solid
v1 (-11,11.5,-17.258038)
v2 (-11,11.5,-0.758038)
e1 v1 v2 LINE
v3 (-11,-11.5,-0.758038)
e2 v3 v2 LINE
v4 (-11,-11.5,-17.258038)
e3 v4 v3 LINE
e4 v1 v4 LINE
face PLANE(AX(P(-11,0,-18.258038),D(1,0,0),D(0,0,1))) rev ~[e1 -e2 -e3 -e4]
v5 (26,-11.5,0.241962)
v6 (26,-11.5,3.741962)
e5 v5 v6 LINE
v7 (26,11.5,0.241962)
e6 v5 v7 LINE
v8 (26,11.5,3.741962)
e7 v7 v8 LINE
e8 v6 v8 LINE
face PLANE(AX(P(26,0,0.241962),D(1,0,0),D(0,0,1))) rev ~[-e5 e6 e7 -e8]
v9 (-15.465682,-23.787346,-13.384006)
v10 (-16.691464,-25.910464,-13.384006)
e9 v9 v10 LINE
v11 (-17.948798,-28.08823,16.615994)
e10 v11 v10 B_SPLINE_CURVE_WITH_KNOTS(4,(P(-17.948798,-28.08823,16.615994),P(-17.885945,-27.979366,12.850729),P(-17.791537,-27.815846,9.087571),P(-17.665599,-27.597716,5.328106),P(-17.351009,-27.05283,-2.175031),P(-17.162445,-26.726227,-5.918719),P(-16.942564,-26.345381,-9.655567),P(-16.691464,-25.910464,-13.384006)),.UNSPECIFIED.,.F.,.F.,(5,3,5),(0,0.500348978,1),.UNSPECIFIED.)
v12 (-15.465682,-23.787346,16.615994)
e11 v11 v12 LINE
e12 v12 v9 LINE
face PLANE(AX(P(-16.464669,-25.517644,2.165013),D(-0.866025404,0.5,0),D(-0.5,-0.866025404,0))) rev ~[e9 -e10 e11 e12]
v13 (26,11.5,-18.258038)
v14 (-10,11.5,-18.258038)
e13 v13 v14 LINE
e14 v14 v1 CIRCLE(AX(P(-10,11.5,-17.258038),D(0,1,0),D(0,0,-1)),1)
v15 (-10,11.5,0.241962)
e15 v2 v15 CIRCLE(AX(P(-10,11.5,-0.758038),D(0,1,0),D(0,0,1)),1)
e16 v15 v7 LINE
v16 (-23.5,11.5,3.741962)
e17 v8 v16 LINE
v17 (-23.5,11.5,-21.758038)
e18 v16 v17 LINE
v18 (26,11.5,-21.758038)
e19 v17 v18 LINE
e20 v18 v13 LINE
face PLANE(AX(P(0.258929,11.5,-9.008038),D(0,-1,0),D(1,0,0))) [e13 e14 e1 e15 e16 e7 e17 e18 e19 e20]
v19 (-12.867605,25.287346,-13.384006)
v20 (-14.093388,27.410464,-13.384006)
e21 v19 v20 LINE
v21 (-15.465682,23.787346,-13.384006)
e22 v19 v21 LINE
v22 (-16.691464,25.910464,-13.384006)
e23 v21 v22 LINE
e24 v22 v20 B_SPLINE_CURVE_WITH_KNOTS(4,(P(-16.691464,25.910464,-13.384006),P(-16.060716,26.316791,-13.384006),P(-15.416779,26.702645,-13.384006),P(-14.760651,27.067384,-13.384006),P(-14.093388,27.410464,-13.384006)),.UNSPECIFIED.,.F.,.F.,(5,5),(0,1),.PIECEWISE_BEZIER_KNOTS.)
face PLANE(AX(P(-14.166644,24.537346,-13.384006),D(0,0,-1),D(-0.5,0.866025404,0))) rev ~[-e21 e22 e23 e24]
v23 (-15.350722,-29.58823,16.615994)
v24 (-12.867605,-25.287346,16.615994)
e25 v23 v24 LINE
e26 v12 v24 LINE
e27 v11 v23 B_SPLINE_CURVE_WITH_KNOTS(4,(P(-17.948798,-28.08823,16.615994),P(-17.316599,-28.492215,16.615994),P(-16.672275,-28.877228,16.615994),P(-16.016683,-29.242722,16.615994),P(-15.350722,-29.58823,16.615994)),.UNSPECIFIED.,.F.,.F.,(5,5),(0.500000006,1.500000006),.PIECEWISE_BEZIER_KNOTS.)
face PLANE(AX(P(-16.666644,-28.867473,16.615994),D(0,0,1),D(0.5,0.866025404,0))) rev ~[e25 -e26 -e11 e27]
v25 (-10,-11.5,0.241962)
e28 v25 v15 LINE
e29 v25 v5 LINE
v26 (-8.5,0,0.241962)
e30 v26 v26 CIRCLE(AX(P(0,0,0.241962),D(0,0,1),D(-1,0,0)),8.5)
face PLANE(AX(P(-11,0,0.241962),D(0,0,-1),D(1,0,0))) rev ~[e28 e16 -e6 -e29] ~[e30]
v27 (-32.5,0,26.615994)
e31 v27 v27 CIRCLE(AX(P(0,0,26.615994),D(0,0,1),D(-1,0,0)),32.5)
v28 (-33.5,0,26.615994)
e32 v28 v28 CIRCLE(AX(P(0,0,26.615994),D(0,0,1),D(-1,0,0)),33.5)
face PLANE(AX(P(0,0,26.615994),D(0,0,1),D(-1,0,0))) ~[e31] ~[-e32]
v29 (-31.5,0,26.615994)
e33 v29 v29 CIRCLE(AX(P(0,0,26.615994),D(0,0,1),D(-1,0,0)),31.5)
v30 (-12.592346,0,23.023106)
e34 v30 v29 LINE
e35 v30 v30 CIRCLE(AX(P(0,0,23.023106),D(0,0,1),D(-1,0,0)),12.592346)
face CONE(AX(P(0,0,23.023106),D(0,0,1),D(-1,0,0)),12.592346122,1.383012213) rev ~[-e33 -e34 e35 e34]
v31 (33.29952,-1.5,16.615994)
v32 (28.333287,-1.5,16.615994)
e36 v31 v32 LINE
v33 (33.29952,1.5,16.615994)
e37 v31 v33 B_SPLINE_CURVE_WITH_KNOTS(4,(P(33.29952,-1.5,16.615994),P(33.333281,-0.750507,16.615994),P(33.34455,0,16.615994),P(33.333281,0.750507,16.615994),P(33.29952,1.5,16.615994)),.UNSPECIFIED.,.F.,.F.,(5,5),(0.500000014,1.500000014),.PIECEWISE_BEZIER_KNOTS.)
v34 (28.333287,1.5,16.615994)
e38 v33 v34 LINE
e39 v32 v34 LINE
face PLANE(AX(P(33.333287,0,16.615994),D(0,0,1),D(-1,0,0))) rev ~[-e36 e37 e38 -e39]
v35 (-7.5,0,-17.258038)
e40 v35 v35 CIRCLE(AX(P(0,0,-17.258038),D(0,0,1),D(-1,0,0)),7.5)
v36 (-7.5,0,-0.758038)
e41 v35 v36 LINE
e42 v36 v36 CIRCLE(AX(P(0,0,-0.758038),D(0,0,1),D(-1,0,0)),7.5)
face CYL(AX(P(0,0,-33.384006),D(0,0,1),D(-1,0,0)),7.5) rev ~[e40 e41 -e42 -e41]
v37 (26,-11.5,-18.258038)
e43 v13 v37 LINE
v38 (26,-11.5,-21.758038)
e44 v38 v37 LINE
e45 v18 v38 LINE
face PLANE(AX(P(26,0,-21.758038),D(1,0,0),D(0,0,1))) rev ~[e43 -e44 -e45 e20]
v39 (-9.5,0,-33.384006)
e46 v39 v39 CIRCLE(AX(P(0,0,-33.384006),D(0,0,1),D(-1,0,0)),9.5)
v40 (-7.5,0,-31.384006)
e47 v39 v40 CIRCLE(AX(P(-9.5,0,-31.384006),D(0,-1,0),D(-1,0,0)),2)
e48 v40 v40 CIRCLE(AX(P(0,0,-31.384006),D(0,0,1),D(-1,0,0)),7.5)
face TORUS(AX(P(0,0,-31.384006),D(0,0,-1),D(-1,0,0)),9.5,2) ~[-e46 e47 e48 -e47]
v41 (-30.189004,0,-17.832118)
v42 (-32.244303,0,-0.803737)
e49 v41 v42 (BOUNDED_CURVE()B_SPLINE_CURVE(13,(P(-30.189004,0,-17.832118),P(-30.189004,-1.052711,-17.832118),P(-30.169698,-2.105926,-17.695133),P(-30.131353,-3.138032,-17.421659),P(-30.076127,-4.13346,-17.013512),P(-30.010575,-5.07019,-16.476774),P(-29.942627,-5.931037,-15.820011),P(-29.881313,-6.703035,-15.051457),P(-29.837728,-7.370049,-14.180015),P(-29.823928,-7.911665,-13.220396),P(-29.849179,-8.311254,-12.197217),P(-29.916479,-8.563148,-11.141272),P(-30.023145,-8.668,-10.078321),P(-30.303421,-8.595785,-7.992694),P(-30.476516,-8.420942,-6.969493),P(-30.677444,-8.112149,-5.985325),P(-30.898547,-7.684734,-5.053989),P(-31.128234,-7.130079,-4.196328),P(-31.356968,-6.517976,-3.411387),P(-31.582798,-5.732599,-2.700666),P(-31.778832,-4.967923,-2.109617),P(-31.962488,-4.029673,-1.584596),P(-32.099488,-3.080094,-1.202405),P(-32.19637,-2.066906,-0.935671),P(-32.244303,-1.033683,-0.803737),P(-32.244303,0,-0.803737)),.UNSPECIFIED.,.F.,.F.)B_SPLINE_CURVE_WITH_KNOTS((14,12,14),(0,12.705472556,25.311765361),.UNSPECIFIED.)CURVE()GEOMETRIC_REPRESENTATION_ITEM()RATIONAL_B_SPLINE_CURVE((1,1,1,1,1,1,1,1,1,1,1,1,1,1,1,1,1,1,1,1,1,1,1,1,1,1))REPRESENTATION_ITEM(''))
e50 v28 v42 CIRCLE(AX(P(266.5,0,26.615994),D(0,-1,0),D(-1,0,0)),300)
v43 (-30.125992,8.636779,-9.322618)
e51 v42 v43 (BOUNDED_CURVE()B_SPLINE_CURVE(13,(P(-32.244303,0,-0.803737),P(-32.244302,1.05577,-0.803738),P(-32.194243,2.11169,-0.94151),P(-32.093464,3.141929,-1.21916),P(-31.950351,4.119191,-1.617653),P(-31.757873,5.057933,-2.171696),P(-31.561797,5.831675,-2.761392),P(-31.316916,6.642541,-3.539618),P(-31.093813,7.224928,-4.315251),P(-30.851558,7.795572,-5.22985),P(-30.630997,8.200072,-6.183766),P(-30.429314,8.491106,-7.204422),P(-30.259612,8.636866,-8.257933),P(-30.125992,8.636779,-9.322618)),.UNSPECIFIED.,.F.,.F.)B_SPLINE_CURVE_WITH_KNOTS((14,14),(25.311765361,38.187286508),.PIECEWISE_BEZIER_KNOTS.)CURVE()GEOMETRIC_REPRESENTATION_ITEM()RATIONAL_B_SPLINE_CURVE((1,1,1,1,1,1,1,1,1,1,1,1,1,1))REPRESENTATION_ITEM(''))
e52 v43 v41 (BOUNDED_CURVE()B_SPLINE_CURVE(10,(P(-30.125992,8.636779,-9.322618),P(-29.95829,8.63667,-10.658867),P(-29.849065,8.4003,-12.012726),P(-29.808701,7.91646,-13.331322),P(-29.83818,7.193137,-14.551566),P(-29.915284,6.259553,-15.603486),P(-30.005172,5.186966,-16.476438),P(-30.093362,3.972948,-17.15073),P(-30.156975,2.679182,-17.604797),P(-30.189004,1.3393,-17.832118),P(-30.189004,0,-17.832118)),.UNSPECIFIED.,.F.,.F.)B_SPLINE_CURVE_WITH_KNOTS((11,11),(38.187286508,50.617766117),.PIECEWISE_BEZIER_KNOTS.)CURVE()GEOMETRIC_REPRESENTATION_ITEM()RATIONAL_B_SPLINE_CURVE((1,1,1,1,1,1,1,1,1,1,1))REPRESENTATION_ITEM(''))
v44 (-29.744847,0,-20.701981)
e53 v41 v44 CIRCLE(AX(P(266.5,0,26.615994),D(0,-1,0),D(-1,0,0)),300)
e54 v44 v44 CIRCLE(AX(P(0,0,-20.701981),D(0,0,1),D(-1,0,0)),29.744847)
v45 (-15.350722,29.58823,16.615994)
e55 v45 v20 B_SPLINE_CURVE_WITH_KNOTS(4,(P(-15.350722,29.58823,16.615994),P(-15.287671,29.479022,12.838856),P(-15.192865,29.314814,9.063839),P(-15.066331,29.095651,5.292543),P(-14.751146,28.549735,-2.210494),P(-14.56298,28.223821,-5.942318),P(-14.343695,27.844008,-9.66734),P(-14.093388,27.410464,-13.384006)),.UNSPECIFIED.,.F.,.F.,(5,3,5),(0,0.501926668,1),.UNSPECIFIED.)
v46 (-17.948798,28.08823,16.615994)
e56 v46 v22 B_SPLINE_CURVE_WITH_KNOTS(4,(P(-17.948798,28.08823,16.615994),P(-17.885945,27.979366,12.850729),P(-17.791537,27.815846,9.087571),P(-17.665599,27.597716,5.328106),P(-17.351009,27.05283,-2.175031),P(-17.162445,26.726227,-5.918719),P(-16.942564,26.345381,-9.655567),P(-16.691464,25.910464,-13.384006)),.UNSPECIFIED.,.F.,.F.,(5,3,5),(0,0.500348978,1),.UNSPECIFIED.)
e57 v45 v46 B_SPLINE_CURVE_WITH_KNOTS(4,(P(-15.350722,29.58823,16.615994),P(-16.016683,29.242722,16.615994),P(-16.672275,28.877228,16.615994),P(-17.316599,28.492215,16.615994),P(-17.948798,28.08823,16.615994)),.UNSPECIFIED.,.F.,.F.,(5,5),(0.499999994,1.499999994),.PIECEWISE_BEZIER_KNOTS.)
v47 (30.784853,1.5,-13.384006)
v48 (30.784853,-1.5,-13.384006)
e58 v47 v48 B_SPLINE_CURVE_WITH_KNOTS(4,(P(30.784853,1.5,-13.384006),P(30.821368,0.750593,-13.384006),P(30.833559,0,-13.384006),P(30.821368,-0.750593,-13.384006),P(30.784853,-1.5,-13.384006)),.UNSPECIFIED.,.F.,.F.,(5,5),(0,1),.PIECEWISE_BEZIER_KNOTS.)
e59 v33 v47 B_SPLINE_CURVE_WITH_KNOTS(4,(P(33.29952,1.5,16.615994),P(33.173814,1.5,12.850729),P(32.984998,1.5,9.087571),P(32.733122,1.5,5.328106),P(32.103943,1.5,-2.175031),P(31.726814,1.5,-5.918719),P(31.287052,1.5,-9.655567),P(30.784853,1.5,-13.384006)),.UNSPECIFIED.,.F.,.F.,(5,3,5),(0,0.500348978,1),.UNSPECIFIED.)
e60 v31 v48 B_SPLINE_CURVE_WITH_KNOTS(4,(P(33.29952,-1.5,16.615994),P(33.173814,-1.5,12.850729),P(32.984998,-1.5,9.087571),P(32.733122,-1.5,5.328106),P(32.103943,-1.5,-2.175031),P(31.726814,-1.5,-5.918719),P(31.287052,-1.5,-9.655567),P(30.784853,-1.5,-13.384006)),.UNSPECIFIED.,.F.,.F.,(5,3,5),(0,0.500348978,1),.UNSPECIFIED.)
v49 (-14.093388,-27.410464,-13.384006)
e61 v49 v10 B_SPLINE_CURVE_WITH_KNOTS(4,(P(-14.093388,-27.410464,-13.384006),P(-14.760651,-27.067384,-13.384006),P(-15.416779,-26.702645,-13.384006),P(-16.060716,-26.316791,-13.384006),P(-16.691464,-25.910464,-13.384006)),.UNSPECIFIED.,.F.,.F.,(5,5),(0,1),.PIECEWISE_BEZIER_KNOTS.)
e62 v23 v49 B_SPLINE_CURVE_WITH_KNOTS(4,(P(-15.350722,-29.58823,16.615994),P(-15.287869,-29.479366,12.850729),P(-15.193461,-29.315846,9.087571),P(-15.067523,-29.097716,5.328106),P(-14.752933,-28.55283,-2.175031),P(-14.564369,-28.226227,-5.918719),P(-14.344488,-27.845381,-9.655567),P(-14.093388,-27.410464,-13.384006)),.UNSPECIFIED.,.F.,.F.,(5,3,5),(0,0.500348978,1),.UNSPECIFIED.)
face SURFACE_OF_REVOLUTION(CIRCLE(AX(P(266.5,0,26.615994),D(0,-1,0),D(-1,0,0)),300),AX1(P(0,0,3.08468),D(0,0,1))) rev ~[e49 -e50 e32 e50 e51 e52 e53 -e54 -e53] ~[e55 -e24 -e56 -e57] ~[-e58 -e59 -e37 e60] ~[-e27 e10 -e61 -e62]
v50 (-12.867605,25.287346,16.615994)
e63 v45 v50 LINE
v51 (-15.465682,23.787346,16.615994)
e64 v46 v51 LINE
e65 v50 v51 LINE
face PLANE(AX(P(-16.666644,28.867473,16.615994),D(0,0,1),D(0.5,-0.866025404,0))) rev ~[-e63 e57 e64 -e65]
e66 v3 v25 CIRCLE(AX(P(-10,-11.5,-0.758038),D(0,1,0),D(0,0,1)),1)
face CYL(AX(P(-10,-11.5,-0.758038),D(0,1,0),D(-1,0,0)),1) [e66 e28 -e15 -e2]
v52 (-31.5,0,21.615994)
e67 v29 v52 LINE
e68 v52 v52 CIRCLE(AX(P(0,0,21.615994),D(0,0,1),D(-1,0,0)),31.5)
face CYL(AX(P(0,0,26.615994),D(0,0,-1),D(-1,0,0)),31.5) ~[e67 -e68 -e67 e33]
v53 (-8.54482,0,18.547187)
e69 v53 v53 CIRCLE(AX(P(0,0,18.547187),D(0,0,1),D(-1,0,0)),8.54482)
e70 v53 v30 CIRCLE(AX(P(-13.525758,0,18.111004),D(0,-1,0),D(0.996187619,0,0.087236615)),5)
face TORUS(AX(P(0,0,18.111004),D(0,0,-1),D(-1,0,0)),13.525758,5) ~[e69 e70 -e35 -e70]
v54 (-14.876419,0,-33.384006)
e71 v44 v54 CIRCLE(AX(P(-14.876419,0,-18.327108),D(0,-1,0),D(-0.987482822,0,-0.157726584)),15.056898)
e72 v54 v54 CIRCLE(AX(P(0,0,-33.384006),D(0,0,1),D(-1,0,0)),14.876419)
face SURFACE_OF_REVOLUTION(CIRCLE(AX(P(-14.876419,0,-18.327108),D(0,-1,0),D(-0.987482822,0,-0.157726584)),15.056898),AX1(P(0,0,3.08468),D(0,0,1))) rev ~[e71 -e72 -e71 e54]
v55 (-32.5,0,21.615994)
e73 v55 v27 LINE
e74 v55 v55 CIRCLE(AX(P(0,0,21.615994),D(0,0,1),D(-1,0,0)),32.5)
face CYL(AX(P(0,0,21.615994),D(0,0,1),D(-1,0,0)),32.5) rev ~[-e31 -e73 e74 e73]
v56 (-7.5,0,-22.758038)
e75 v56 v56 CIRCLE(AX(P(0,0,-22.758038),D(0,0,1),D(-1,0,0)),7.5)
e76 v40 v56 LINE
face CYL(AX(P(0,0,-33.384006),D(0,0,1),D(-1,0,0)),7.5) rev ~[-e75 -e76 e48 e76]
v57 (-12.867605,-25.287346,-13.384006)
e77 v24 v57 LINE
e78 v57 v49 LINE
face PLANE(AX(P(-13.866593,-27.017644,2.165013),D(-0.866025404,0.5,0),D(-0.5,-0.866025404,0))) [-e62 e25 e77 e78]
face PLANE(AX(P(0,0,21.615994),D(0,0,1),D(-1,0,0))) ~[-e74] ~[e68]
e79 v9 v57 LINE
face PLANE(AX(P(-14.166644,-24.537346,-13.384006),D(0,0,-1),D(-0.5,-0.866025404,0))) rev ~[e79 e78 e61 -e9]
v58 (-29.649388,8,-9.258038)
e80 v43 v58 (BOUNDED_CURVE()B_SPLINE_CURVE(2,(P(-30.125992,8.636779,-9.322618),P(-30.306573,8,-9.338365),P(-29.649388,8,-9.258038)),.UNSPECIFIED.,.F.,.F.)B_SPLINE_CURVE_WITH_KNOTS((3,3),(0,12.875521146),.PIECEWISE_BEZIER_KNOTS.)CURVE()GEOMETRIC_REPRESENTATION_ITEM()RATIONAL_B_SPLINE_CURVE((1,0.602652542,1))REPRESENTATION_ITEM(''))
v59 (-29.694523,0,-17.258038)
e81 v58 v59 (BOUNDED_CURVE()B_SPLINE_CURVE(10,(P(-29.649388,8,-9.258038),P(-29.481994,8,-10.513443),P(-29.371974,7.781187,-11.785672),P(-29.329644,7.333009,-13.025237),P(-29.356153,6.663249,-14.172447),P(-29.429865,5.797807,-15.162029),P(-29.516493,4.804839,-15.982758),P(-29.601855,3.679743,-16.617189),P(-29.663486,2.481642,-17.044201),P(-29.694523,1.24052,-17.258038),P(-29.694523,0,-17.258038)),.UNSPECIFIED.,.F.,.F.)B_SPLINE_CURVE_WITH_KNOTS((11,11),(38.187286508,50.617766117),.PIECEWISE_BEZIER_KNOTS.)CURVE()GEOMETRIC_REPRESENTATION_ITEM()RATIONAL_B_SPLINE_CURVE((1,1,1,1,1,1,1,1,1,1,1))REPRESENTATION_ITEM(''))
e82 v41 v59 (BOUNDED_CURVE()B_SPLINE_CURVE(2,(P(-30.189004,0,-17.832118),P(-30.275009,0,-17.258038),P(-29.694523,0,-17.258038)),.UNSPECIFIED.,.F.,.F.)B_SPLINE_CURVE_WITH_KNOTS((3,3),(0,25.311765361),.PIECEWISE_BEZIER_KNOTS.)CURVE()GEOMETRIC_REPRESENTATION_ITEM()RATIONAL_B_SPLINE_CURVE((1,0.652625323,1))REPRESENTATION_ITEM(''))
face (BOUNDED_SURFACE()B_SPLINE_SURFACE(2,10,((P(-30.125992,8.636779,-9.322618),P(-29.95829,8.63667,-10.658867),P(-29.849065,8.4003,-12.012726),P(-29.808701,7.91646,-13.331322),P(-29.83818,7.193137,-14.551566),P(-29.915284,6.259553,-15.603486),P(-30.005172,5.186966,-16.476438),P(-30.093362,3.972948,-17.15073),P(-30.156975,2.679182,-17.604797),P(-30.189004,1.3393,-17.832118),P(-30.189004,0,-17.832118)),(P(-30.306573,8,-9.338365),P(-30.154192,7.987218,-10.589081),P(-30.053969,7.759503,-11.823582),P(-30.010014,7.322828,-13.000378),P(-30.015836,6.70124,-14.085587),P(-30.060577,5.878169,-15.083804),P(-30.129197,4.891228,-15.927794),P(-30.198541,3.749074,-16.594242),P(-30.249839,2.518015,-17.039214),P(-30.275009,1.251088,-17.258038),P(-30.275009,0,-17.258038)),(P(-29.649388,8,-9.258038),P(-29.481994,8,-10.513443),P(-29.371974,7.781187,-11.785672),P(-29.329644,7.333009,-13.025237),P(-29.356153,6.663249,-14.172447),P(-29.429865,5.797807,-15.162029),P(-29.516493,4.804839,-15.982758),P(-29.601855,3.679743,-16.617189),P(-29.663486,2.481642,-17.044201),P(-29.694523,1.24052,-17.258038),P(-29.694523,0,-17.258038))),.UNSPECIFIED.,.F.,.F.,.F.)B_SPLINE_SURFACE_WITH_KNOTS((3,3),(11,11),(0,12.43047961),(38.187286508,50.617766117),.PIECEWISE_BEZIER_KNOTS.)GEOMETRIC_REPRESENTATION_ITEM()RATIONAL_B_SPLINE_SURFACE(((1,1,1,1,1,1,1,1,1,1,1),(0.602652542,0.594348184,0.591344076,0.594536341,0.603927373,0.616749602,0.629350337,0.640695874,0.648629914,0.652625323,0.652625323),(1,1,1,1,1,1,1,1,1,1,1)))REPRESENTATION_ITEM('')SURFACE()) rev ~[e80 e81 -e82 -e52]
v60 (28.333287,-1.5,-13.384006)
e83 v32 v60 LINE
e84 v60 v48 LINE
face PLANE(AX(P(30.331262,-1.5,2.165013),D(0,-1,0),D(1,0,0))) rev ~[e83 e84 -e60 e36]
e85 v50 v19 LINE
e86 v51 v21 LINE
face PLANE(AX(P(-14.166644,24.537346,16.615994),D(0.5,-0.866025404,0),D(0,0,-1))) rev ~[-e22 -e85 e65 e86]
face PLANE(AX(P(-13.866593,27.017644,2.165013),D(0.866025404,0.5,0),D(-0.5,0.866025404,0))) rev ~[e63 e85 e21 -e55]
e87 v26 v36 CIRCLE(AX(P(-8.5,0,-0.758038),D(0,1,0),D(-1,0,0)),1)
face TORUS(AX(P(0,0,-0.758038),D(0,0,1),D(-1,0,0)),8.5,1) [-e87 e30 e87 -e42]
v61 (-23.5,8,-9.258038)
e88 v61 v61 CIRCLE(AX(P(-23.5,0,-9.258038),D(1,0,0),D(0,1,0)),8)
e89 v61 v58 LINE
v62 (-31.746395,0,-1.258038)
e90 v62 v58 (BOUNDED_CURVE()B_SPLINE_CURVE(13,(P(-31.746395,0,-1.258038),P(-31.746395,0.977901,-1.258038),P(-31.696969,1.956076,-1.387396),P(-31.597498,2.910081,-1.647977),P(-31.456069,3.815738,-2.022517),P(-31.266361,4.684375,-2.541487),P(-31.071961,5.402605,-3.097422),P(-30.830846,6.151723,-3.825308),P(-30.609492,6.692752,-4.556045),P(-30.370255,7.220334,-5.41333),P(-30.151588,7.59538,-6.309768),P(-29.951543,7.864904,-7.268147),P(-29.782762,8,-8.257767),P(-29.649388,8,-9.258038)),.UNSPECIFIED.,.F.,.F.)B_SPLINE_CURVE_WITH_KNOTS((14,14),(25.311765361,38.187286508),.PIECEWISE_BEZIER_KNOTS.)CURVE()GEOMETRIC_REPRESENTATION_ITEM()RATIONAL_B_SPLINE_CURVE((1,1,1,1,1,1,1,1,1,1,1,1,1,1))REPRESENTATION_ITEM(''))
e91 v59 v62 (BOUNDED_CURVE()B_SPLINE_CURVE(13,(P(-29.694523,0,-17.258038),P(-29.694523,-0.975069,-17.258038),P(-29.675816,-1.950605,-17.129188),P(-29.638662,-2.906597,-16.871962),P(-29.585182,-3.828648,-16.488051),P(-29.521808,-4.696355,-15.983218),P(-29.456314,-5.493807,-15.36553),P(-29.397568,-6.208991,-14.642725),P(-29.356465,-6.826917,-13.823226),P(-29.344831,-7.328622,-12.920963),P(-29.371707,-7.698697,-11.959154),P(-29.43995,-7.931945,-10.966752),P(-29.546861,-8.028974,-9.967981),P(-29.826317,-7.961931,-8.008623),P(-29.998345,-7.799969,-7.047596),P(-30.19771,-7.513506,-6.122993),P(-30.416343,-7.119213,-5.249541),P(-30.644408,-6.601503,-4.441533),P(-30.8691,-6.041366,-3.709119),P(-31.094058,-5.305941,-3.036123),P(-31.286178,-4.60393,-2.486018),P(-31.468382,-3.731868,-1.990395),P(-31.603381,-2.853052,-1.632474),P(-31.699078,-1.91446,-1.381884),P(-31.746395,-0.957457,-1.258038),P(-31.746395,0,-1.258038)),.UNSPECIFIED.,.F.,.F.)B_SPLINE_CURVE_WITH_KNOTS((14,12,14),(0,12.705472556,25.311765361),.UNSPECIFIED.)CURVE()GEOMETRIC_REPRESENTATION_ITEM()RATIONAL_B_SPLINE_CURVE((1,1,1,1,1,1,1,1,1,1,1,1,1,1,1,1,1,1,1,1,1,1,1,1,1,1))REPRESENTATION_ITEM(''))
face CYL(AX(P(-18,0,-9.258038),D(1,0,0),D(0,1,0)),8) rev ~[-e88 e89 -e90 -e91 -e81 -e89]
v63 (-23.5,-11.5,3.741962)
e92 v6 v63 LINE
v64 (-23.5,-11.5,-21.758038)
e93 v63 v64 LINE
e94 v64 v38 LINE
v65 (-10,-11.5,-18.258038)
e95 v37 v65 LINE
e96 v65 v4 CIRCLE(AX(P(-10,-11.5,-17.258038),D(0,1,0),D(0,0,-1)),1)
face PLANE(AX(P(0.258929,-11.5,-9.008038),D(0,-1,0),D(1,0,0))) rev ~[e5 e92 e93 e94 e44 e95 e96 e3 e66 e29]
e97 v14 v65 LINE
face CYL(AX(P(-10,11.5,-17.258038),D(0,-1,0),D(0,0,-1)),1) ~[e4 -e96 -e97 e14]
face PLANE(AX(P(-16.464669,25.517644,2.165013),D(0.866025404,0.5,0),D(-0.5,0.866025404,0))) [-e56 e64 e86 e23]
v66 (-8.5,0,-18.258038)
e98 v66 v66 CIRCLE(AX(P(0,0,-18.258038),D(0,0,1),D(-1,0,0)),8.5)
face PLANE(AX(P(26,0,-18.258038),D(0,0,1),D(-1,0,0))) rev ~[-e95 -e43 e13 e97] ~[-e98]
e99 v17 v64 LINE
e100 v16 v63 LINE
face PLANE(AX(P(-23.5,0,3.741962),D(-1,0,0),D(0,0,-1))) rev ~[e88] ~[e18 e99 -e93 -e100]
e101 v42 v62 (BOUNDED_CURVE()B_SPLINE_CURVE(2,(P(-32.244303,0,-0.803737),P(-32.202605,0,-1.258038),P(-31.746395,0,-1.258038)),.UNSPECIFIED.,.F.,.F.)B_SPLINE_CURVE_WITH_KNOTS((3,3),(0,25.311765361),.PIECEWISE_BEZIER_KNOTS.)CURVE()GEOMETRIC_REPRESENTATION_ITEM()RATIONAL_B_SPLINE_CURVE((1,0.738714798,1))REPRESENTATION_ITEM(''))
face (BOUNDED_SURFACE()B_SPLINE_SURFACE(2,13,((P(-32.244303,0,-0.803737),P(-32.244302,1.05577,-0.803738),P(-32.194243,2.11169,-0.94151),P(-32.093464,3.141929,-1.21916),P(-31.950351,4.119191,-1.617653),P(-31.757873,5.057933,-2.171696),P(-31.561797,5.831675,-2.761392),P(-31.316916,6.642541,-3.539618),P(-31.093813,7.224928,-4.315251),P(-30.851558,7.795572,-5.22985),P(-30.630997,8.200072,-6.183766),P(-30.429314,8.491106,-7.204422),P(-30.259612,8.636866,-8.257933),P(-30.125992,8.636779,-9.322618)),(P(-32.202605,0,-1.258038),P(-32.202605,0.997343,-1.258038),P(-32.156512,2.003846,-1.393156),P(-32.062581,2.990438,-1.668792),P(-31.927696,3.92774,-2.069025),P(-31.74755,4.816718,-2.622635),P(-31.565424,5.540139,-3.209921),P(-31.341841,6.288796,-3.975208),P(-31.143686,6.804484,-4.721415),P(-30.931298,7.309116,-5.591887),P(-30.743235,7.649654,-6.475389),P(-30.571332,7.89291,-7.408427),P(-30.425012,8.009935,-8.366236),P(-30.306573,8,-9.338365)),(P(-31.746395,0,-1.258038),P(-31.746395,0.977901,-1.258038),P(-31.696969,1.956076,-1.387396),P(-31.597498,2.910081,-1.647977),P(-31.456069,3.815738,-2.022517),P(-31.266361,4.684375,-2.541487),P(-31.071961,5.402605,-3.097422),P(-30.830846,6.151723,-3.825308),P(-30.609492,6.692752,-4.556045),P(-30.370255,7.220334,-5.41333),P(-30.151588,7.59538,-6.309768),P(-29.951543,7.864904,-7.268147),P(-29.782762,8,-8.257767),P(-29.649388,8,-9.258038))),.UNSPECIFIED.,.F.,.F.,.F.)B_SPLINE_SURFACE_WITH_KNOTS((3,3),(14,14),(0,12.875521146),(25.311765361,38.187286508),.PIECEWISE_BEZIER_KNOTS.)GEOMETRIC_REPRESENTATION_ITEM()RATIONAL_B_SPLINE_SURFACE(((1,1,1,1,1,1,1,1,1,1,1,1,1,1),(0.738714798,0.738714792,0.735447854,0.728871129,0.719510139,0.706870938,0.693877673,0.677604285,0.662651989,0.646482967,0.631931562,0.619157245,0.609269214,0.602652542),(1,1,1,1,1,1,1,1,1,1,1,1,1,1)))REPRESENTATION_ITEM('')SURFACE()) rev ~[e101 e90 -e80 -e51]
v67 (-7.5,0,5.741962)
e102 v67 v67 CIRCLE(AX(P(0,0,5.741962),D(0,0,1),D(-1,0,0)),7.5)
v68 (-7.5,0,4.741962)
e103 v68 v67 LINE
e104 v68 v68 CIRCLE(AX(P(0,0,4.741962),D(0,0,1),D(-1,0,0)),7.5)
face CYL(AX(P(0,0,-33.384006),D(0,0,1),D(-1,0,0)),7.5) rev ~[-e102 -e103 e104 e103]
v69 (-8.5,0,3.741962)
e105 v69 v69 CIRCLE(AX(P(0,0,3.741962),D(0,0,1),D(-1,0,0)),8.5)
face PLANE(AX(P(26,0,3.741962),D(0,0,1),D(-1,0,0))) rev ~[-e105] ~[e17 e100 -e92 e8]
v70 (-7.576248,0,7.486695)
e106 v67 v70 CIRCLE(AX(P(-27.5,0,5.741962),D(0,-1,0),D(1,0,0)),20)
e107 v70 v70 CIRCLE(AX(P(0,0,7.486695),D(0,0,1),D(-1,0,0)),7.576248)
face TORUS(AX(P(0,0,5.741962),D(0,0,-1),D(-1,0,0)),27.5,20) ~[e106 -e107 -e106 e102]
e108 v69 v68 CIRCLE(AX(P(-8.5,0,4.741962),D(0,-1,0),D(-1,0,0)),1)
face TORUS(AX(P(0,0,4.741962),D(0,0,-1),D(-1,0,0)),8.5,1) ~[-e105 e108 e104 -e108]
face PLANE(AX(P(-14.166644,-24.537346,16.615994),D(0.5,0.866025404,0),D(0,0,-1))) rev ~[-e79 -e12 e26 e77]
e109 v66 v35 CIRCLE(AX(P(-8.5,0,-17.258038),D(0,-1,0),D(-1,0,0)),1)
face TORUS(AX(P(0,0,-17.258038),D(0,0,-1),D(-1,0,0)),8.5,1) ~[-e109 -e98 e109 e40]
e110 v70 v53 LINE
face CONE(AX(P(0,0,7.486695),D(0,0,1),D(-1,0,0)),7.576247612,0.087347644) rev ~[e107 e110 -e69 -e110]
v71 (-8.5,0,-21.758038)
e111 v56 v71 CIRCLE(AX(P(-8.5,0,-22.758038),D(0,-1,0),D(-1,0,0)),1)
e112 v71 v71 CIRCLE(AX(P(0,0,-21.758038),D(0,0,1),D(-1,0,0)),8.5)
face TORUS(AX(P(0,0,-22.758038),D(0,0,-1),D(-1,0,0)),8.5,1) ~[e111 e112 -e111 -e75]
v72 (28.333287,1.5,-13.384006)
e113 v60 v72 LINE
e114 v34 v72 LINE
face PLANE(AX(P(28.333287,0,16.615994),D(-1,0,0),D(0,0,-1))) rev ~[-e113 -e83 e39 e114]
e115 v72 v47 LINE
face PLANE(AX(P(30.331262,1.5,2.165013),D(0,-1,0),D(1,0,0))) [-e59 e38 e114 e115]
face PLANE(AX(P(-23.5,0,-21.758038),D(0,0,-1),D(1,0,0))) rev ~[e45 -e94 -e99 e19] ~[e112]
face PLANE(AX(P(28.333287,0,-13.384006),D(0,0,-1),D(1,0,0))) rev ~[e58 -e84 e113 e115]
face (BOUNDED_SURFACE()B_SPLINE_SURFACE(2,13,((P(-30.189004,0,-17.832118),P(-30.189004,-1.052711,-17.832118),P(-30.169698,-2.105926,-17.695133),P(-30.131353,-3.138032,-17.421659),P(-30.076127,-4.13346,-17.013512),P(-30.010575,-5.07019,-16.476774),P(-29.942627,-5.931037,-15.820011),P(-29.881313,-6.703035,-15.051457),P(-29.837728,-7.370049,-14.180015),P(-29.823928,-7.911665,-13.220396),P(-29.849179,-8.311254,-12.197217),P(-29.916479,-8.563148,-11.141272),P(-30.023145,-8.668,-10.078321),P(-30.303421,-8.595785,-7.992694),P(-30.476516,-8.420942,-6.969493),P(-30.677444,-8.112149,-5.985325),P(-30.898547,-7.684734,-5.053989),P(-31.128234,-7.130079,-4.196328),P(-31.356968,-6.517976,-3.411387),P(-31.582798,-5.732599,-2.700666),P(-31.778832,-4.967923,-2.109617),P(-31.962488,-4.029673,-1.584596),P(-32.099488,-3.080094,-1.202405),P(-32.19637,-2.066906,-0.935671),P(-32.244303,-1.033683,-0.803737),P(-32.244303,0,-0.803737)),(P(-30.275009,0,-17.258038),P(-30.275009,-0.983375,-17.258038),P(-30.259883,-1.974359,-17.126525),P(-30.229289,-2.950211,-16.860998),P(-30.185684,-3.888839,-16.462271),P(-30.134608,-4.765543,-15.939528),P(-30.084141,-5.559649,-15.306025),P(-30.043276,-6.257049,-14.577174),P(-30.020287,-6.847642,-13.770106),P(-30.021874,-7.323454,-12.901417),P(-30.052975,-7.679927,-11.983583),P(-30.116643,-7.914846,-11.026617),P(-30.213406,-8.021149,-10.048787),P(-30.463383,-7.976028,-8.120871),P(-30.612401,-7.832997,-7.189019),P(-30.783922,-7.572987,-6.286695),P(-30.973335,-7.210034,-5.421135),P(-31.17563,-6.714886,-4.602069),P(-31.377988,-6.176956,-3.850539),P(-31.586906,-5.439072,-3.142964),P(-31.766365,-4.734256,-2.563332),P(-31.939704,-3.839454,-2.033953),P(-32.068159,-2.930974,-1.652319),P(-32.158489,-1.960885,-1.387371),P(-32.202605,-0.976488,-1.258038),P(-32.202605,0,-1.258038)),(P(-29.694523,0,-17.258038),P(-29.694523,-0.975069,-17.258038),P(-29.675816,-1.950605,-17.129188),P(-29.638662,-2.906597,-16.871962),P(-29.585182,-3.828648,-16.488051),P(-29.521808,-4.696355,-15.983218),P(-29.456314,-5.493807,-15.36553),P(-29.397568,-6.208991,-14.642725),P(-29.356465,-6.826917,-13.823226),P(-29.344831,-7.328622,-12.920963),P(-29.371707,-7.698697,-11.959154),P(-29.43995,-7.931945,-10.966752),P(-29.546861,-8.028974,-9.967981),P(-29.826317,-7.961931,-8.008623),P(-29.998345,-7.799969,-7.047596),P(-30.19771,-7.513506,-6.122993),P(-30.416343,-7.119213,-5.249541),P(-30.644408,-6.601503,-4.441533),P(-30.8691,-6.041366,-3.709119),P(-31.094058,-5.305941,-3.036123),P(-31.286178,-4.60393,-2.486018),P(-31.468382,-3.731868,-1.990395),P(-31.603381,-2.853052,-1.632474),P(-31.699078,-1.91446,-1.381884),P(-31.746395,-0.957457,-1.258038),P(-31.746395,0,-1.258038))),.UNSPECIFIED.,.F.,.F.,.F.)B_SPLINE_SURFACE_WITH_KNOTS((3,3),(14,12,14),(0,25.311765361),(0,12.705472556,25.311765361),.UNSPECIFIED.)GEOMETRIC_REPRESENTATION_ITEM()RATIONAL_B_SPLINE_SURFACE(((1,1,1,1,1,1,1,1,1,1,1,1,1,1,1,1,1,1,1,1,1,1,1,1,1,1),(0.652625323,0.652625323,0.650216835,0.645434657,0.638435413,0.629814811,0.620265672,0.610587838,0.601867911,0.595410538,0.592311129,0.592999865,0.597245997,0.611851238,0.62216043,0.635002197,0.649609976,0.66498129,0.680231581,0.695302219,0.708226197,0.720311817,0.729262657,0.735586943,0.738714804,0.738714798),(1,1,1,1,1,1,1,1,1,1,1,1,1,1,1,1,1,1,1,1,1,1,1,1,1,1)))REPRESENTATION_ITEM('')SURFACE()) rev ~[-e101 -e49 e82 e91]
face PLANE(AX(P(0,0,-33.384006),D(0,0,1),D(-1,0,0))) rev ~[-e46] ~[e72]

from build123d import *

# Parameters (mm, degrees)
F3_DEPTH         = 11.5
F5_R             = 8
F6_DEPTH         = 25
F7_R             = 0.5
F8_R             = 2
F9_R             = 1
F11_DEPTH        = 1.5
F11_COPIES_COUNT = 3


# Not quite as in the source:
# - a pattern or mirror of a feature is missing from the dataset's text; its kind, count and spacing are read off the source's solid


with BuildPart() as f1:
    # F0 (on Front) → F1 (revolve)
    with BuildSketch(Plane.XZ):
        with BuildLine():
            Line((-12.5923461222, 23.0231059935), (-31.5, 26.6159944863))
            Line((-31.5, 26.6159944863), (-31.5, 21.6159944863))
            Line((-31.5, 21.6159944863), (-32.5, 21.6159944863))
            Line((-32.5, 21.6159944863), (-32.5, 26.6159944863))
            Line((-32.5, 26.6159944863), (-33.5, 26.6159944863))
            ThreePointArc((-33.5, 26.6159944863), (-32.559738199, 2.8826216042), (-29.7448467442, -20.7019807185))
            ThreePointArc((-29.7448467442, -20.7019807185), (-24.647599638, -29.7828571781), (-14.876418747, -33.3840055137))
            Line((-14.876418747, -33.3840055137), (-7.5, -33.3840055137))
            Line((-7.5, -33.3840055137), (-7.5, 5.7419622669))
            ThreePointArc((-7.5, 5.7419622669), (-7.5190709956, 6.6151610531), (-7.576247612, 7.4866945623))
            Line((-7.576247612, 7.4866945623), (-8.5448201406, 18.5471874985))
            ThreePointArc((-8.5448201406, 18.5471874985), (-9.8172078197, 21.4646075314), (-12.5923461222, 23.0231059935))
        make_face()
    revolve(axis=Axis((0, 0, 3.0846800655), (0, 0, 1)))

    # F2 (on Front) → F3 (cut, symmetric)
    with BuildSketch(Plane.XZ):
        Polygon((26, 3.7419622669), (-23.5, 3.7419622669), (-23.5, -21.7580377331), (26, -21.7580377331), (26, -18.2580377331), (-11, -18.2580377331), (-11, 0.2419622669), (26, 0.2419622669), align=None)
    extrude(amount=F3_DEPTH, both=True, mode=Mode.SUBTRACT)

    # F5 (on offset) → F6 (cut)
    with BuildSketch(Plane.YZ.offset(-18)):
        with Locations((0, -9.2580377331)):
            Circle(F5_R)
    extrude(amount=-F6_DEPTH, mode=Mode.SUBTRACT)

    # F7
    f7_edges = [f1.edges().sort_by_distance(p)[0] for p in [
        (-30.318545, -7.999666, -9.184947),
        (-30.084057, 5.659565, -14.91218),
        (-31.464589, 5.675758, -3.620151),
    ]]
    fillet(f7_edges, radius=F7_R)

    # F8
    f8_edges = [f1.edges().sort_by_distance(p)[0] for p in [
        (7.5, 0, -33.384006),
    ]]
    fillet(f8_edges, radius=F8_R)

    # F9
    f9_edges = [f1.edges().sort_by_distance(p)[0] for p in [
        (7.5, 0, -21.758038),
        (7.5, 0, -18.258038),
        (7.5, 0, 0.241962),
        (7.5, 0, 3.741962),
        (-11, 0, 0.241962),
        (-11, 0, -18.258038),
    ]]
    fillet(f9_edges, radius=F9_R)

    # F10 (on Front) → F11 (cut, symmetric)
    with BuildSketch(Plane.XZ):
        with BuildLine():
            Line((28.3332870113, -13.3840055137), (30.8213749464, -13.3840055137))
            ThreePointArc((30.8213749464, -13.3840055137), (32.4538803469, 1.5844658563), (33.3332870113, 16.6159944863))
            Line((33.3332870113, 16.6159944863), (28.3332870113, 16.6159944863))
            Line((28.3332870113, 16.6159944863), (28.3332870113, -13.3840055137))
        make_face()
    f11 = extrude(amount=F11_DEPTH, both=True, mode=Mode.SUBTRACT)

    # F11_copies: F11 ×3 about axis
    f11_copies_axis = Axis((0, 0, 0), (0, 0, 1))
    for i in range(1, F11_COPIES_COUNT):
        add(f11.rotate(f11_copies_axis, i * 360 / F11_COPIES_COUNT), mode=Mode.SUBTRACT)


solid = f1.part
